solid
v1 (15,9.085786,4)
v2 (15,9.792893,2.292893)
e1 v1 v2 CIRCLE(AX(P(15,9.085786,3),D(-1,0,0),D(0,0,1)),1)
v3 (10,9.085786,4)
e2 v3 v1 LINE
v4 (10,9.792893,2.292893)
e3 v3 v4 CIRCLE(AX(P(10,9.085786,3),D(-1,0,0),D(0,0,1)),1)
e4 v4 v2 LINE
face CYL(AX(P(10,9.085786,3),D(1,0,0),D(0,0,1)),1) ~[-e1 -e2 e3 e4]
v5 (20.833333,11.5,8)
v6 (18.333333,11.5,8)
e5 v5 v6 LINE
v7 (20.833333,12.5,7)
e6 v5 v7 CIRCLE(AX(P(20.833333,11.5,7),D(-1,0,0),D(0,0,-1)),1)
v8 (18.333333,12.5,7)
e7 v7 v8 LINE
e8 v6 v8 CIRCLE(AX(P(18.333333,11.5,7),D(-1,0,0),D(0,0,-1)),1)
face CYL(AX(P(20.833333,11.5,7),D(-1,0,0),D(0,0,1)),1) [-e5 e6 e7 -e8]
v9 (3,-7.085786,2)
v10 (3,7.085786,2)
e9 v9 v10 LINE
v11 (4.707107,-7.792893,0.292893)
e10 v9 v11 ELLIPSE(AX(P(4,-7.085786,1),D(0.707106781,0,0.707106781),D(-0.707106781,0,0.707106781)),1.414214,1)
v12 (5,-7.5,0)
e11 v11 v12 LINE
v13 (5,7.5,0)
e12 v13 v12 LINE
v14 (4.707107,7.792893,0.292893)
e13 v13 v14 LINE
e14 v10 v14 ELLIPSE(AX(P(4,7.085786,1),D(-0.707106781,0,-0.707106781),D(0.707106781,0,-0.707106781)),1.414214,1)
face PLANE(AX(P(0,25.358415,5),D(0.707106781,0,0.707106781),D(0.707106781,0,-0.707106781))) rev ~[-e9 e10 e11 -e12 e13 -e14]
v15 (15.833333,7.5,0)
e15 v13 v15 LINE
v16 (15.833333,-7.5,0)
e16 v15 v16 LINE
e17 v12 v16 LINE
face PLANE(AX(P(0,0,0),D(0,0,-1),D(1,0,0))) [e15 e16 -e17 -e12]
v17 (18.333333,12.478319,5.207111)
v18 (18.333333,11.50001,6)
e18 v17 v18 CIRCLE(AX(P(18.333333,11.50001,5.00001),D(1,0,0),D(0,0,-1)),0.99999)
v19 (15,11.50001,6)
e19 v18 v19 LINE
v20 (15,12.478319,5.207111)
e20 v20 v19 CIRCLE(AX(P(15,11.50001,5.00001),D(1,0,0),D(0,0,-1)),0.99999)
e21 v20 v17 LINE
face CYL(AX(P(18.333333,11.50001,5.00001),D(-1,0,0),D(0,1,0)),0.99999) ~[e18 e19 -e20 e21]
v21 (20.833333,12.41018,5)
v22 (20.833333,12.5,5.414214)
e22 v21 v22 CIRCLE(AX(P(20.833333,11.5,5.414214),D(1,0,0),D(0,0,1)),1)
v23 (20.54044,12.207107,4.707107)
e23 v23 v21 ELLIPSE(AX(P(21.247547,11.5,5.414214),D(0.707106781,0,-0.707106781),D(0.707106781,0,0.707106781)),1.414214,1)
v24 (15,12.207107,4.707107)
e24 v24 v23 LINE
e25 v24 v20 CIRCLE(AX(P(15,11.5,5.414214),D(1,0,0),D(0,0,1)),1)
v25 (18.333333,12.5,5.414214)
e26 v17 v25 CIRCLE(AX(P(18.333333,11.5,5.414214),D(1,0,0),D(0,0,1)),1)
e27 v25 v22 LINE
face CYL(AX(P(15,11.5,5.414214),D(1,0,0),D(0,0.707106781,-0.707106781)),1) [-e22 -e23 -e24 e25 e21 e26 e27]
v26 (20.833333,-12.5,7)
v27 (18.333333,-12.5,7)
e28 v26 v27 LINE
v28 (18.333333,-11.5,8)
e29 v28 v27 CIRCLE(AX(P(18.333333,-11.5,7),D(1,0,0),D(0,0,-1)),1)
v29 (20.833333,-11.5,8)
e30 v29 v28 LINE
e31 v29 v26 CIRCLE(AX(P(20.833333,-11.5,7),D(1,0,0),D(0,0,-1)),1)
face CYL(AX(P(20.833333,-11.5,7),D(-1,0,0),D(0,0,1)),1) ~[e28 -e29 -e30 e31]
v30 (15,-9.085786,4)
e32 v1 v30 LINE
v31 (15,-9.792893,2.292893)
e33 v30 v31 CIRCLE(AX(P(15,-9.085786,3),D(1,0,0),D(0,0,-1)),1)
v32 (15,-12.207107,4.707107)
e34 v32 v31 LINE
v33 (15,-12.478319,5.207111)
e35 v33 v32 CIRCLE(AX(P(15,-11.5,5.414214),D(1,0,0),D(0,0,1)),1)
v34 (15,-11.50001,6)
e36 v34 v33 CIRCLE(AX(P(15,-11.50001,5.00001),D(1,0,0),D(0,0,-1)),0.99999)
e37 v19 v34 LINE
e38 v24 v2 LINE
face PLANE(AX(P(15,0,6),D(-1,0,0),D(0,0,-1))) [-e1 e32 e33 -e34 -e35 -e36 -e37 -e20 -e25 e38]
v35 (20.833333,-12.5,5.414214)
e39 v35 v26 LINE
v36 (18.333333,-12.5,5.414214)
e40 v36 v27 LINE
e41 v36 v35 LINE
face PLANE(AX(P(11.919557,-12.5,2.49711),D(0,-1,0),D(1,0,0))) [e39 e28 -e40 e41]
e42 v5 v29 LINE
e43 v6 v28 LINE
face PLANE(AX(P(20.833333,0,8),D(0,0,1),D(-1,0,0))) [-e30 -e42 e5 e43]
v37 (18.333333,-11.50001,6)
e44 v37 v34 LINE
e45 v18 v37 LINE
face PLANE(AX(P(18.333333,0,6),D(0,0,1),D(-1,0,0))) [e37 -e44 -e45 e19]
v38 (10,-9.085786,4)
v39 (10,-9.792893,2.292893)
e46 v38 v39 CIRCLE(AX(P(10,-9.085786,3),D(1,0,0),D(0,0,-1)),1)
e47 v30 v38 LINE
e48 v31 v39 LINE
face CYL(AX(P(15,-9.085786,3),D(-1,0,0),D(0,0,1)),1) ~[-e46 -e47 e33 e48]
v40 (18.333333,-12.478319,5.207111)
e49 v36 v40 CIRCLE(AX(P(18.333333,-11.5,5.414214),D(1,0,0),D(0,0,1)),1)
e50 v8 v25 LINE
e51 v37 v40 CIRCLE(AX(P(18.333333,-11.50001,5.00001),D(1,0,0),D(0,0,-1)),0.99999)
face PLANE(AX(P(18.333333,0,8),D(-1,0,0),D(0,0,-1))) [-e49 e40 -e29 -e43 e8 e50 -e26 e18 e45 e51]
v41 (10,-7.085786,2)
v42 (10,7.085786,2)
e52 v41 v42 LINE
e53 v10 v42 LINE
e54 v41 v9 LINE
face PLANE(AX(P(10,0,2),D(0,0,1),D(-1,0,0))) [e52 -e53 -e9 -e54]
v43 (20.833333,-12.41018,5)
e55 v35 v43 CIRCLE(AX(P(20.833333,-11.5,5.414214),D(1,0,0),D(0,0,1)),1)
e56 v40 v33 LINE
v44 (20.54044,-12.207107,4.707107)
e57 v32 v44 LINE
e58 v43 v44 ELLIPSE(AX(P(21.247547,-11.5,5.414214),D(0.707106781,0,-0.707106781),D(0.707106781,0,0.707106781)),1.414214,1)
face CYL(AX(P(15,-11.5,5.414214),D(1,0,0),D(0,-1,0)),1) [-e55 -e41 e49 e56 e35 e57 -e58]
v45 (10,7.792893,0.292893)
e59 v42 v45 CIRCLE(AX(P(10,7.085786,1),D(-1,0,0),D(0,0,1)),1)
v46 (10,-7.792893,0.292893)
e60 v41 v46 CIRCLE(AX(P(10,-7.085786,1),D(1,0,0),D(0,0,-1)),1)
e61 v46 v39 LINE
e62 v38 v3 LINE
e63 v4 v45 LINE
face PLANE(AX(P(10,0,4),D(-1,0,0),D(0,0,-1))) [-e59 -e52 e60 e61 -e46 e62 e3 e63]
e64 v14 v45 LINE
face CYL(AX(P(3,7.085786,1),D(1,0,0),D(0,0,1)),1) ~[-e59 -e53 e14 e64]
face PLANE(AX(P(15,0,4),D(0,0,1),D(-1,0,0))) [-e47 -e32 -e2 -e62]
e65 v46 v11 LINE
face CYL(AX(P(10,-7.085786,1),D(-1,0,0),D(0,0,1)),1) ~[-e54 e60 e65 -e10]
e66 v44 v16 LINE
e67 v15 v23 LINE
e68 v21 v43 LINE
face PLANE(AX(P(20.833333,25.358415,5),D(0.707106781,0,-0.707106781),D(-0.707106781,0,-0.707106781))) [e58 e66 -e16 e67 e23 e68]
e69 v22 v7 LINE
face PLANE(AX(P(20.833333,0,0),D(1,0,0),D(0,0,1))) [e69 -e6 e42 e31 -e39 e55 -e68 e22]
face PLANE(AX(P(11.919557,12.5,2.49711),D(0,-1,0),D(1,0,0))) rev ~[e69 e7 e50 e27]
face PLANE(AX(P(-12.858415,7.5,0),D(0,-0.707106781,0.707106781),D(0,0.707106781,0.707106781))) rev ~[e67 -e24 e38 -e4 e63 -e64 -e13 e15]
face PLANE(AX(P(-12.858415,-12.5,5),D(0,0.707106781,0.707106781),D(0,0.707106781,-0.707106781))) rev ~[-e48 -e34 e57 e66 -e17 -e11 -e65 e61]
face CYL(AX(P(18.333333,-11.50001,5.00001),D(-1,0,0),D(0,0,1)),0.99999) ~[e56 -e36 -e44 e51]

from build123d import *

# Parameters (mm, degrees)
F2_DEPTH    = 12.5
F3_T1_DEPTH = 46.550163213
F3_T3_DEPTH = 50.7168298797
F4_R        = 1
F4_R_2      = 0.99999


# Not quite as in the source:
# - a fillet or chamfer that OpenCascade refuses, or shapes differently, is made with other operations: its cross-section is extruded or revolved along the edge and cut away or added
# - a fillet or chamfer is up to 0.001 mm smaller than in the source, because OpenCascade refuses the exact size


with BuildPart() as f2:
    # F1 (on Front) → F2 (new body, symmetric)
    with BuildSketch(Plane.XZ):
        Polygon((0, 2), (0, 0), (20.8333333333, 0), (20.8333333333, 8), (18.3333333333, 8), (18.3333333333, 6), (15, 6), (15, 4), (10, 4), (10, 2), align=None)
    extrude(amount=F2_DEPTH, both=True)

    # F3: chamfer of 5 on 4 edges, made by hand

    # F3_s2 → F3_t1 (cut)
    with BuildSketch(Plane.YZ.offset(-12.8584149398)):
        Polygon((-12.5, 5), (-7.5, 0), (-12.5, 0), align=None)
        Polygon((7.5, 0), (12.5, 5), (12.5, 0), align=None)
    extrude(amount=F3_T1_DEPTH, mode=Mode.SUBTRACT)

    # F3_s4 → F3_t3 (cut)
    with BuildSketch(Plane.XZ.offset(-25.3584149398)):
        Polygon((0, 5), (5, 0), (0, 0), align=None)
        Polygon((20.8333333333, 5), (15.8333333333, 0), (20.8333333333, 0), align=None)
    extrude(amount=F3_T3_DEPTH, mode=Mode.SUBTRACT)

    # F4 (call 1 of 10: OpenCascade refuses the feature's edges together)
    f4_edges = [f2.edges().sort_by_distance(p)[0] for p in [
        (6.5, -9.5, 2),
    ]]
    fillet(f4_edges, radius=F4_R)

    # F4#2 (call 2 of 10)
    f4_2_edges = [f2.edges().sort_by_distance(p)[0] for p in [
        (12.5, -11.5, 4),
    ]]
    fillet(f4_2_edges, radius=F4_R)

    # F4#3 (call 3 of 10) (radius 1 in the source; OpenCascade refuses exactly that, so slightly less here)
    f4_3_edges = [f2.edges().sort_by_distance(p)[0] for p in [
        (16.666667, -12.5, 6),
    ]]
    fillet(f4_3_edges, radius=F4_R_2)

    # F4#4 (call 4 of 10)
    f4_4_edges = [f2.edges().sort_by_distance(p)[0] for p in [
        (19.583333, -12.5, 8),
    ]]
    fillet(f4_4_edges, radius=F4_R)

    # F4#5 (call 5 of 10)
    f4_5_edges = [f2.edges().sort_by_distance(p)[0] for p in [
        (19.583333, 12.5, 8),
    ]]
    fillet(f4_5_edges, radius=F4_R)

    # F4#6 (call 6 of 10) (radius 1 in the source; OpenCascade refuses exactly that, so slightly less here)
    f4_6_edges = [f2.edges().sort_by_distance(p)[0] for p in [
        (16.666667, 12.5, 6),
    ]]
    fillet(f4_6_edges, radius=F4_R_2)

    # F4#7 (call 7 of 10)
    f4_7_edges = [f2.edges().sort_by_distance(p)[0] for p in [
        (12.5, 11.5, 4),
    ]]
    fillet(f4_7_edges, radius=F4_R)

    # F4#8 (call 8 of 10)
    f4_8_edges = [f2.edges().sort_by_distance(p)[0] for p in [
        (6.5, 9.5, 2),
    ]]
    fillet(f4_8_edges, radius=F4_R)

    # F4#9 (call 9 of 10)
    f4_9_edges = [f2.edges().sort_by_distance(p)[0] for p in [
        (17.916667, -12.5, 5),
    ]]
    fillet(f4_9_edges, radius=F4_R)

    # F4#10 (call 10 of 10)
    f4_10_edges = [f2.edges().sort_by_distance(p)[0] for p in [
        (17.916667, 12.5, 5),
    ]]
    fillet(f4_10_edges, radius=F4_R)


solid = f2.part
